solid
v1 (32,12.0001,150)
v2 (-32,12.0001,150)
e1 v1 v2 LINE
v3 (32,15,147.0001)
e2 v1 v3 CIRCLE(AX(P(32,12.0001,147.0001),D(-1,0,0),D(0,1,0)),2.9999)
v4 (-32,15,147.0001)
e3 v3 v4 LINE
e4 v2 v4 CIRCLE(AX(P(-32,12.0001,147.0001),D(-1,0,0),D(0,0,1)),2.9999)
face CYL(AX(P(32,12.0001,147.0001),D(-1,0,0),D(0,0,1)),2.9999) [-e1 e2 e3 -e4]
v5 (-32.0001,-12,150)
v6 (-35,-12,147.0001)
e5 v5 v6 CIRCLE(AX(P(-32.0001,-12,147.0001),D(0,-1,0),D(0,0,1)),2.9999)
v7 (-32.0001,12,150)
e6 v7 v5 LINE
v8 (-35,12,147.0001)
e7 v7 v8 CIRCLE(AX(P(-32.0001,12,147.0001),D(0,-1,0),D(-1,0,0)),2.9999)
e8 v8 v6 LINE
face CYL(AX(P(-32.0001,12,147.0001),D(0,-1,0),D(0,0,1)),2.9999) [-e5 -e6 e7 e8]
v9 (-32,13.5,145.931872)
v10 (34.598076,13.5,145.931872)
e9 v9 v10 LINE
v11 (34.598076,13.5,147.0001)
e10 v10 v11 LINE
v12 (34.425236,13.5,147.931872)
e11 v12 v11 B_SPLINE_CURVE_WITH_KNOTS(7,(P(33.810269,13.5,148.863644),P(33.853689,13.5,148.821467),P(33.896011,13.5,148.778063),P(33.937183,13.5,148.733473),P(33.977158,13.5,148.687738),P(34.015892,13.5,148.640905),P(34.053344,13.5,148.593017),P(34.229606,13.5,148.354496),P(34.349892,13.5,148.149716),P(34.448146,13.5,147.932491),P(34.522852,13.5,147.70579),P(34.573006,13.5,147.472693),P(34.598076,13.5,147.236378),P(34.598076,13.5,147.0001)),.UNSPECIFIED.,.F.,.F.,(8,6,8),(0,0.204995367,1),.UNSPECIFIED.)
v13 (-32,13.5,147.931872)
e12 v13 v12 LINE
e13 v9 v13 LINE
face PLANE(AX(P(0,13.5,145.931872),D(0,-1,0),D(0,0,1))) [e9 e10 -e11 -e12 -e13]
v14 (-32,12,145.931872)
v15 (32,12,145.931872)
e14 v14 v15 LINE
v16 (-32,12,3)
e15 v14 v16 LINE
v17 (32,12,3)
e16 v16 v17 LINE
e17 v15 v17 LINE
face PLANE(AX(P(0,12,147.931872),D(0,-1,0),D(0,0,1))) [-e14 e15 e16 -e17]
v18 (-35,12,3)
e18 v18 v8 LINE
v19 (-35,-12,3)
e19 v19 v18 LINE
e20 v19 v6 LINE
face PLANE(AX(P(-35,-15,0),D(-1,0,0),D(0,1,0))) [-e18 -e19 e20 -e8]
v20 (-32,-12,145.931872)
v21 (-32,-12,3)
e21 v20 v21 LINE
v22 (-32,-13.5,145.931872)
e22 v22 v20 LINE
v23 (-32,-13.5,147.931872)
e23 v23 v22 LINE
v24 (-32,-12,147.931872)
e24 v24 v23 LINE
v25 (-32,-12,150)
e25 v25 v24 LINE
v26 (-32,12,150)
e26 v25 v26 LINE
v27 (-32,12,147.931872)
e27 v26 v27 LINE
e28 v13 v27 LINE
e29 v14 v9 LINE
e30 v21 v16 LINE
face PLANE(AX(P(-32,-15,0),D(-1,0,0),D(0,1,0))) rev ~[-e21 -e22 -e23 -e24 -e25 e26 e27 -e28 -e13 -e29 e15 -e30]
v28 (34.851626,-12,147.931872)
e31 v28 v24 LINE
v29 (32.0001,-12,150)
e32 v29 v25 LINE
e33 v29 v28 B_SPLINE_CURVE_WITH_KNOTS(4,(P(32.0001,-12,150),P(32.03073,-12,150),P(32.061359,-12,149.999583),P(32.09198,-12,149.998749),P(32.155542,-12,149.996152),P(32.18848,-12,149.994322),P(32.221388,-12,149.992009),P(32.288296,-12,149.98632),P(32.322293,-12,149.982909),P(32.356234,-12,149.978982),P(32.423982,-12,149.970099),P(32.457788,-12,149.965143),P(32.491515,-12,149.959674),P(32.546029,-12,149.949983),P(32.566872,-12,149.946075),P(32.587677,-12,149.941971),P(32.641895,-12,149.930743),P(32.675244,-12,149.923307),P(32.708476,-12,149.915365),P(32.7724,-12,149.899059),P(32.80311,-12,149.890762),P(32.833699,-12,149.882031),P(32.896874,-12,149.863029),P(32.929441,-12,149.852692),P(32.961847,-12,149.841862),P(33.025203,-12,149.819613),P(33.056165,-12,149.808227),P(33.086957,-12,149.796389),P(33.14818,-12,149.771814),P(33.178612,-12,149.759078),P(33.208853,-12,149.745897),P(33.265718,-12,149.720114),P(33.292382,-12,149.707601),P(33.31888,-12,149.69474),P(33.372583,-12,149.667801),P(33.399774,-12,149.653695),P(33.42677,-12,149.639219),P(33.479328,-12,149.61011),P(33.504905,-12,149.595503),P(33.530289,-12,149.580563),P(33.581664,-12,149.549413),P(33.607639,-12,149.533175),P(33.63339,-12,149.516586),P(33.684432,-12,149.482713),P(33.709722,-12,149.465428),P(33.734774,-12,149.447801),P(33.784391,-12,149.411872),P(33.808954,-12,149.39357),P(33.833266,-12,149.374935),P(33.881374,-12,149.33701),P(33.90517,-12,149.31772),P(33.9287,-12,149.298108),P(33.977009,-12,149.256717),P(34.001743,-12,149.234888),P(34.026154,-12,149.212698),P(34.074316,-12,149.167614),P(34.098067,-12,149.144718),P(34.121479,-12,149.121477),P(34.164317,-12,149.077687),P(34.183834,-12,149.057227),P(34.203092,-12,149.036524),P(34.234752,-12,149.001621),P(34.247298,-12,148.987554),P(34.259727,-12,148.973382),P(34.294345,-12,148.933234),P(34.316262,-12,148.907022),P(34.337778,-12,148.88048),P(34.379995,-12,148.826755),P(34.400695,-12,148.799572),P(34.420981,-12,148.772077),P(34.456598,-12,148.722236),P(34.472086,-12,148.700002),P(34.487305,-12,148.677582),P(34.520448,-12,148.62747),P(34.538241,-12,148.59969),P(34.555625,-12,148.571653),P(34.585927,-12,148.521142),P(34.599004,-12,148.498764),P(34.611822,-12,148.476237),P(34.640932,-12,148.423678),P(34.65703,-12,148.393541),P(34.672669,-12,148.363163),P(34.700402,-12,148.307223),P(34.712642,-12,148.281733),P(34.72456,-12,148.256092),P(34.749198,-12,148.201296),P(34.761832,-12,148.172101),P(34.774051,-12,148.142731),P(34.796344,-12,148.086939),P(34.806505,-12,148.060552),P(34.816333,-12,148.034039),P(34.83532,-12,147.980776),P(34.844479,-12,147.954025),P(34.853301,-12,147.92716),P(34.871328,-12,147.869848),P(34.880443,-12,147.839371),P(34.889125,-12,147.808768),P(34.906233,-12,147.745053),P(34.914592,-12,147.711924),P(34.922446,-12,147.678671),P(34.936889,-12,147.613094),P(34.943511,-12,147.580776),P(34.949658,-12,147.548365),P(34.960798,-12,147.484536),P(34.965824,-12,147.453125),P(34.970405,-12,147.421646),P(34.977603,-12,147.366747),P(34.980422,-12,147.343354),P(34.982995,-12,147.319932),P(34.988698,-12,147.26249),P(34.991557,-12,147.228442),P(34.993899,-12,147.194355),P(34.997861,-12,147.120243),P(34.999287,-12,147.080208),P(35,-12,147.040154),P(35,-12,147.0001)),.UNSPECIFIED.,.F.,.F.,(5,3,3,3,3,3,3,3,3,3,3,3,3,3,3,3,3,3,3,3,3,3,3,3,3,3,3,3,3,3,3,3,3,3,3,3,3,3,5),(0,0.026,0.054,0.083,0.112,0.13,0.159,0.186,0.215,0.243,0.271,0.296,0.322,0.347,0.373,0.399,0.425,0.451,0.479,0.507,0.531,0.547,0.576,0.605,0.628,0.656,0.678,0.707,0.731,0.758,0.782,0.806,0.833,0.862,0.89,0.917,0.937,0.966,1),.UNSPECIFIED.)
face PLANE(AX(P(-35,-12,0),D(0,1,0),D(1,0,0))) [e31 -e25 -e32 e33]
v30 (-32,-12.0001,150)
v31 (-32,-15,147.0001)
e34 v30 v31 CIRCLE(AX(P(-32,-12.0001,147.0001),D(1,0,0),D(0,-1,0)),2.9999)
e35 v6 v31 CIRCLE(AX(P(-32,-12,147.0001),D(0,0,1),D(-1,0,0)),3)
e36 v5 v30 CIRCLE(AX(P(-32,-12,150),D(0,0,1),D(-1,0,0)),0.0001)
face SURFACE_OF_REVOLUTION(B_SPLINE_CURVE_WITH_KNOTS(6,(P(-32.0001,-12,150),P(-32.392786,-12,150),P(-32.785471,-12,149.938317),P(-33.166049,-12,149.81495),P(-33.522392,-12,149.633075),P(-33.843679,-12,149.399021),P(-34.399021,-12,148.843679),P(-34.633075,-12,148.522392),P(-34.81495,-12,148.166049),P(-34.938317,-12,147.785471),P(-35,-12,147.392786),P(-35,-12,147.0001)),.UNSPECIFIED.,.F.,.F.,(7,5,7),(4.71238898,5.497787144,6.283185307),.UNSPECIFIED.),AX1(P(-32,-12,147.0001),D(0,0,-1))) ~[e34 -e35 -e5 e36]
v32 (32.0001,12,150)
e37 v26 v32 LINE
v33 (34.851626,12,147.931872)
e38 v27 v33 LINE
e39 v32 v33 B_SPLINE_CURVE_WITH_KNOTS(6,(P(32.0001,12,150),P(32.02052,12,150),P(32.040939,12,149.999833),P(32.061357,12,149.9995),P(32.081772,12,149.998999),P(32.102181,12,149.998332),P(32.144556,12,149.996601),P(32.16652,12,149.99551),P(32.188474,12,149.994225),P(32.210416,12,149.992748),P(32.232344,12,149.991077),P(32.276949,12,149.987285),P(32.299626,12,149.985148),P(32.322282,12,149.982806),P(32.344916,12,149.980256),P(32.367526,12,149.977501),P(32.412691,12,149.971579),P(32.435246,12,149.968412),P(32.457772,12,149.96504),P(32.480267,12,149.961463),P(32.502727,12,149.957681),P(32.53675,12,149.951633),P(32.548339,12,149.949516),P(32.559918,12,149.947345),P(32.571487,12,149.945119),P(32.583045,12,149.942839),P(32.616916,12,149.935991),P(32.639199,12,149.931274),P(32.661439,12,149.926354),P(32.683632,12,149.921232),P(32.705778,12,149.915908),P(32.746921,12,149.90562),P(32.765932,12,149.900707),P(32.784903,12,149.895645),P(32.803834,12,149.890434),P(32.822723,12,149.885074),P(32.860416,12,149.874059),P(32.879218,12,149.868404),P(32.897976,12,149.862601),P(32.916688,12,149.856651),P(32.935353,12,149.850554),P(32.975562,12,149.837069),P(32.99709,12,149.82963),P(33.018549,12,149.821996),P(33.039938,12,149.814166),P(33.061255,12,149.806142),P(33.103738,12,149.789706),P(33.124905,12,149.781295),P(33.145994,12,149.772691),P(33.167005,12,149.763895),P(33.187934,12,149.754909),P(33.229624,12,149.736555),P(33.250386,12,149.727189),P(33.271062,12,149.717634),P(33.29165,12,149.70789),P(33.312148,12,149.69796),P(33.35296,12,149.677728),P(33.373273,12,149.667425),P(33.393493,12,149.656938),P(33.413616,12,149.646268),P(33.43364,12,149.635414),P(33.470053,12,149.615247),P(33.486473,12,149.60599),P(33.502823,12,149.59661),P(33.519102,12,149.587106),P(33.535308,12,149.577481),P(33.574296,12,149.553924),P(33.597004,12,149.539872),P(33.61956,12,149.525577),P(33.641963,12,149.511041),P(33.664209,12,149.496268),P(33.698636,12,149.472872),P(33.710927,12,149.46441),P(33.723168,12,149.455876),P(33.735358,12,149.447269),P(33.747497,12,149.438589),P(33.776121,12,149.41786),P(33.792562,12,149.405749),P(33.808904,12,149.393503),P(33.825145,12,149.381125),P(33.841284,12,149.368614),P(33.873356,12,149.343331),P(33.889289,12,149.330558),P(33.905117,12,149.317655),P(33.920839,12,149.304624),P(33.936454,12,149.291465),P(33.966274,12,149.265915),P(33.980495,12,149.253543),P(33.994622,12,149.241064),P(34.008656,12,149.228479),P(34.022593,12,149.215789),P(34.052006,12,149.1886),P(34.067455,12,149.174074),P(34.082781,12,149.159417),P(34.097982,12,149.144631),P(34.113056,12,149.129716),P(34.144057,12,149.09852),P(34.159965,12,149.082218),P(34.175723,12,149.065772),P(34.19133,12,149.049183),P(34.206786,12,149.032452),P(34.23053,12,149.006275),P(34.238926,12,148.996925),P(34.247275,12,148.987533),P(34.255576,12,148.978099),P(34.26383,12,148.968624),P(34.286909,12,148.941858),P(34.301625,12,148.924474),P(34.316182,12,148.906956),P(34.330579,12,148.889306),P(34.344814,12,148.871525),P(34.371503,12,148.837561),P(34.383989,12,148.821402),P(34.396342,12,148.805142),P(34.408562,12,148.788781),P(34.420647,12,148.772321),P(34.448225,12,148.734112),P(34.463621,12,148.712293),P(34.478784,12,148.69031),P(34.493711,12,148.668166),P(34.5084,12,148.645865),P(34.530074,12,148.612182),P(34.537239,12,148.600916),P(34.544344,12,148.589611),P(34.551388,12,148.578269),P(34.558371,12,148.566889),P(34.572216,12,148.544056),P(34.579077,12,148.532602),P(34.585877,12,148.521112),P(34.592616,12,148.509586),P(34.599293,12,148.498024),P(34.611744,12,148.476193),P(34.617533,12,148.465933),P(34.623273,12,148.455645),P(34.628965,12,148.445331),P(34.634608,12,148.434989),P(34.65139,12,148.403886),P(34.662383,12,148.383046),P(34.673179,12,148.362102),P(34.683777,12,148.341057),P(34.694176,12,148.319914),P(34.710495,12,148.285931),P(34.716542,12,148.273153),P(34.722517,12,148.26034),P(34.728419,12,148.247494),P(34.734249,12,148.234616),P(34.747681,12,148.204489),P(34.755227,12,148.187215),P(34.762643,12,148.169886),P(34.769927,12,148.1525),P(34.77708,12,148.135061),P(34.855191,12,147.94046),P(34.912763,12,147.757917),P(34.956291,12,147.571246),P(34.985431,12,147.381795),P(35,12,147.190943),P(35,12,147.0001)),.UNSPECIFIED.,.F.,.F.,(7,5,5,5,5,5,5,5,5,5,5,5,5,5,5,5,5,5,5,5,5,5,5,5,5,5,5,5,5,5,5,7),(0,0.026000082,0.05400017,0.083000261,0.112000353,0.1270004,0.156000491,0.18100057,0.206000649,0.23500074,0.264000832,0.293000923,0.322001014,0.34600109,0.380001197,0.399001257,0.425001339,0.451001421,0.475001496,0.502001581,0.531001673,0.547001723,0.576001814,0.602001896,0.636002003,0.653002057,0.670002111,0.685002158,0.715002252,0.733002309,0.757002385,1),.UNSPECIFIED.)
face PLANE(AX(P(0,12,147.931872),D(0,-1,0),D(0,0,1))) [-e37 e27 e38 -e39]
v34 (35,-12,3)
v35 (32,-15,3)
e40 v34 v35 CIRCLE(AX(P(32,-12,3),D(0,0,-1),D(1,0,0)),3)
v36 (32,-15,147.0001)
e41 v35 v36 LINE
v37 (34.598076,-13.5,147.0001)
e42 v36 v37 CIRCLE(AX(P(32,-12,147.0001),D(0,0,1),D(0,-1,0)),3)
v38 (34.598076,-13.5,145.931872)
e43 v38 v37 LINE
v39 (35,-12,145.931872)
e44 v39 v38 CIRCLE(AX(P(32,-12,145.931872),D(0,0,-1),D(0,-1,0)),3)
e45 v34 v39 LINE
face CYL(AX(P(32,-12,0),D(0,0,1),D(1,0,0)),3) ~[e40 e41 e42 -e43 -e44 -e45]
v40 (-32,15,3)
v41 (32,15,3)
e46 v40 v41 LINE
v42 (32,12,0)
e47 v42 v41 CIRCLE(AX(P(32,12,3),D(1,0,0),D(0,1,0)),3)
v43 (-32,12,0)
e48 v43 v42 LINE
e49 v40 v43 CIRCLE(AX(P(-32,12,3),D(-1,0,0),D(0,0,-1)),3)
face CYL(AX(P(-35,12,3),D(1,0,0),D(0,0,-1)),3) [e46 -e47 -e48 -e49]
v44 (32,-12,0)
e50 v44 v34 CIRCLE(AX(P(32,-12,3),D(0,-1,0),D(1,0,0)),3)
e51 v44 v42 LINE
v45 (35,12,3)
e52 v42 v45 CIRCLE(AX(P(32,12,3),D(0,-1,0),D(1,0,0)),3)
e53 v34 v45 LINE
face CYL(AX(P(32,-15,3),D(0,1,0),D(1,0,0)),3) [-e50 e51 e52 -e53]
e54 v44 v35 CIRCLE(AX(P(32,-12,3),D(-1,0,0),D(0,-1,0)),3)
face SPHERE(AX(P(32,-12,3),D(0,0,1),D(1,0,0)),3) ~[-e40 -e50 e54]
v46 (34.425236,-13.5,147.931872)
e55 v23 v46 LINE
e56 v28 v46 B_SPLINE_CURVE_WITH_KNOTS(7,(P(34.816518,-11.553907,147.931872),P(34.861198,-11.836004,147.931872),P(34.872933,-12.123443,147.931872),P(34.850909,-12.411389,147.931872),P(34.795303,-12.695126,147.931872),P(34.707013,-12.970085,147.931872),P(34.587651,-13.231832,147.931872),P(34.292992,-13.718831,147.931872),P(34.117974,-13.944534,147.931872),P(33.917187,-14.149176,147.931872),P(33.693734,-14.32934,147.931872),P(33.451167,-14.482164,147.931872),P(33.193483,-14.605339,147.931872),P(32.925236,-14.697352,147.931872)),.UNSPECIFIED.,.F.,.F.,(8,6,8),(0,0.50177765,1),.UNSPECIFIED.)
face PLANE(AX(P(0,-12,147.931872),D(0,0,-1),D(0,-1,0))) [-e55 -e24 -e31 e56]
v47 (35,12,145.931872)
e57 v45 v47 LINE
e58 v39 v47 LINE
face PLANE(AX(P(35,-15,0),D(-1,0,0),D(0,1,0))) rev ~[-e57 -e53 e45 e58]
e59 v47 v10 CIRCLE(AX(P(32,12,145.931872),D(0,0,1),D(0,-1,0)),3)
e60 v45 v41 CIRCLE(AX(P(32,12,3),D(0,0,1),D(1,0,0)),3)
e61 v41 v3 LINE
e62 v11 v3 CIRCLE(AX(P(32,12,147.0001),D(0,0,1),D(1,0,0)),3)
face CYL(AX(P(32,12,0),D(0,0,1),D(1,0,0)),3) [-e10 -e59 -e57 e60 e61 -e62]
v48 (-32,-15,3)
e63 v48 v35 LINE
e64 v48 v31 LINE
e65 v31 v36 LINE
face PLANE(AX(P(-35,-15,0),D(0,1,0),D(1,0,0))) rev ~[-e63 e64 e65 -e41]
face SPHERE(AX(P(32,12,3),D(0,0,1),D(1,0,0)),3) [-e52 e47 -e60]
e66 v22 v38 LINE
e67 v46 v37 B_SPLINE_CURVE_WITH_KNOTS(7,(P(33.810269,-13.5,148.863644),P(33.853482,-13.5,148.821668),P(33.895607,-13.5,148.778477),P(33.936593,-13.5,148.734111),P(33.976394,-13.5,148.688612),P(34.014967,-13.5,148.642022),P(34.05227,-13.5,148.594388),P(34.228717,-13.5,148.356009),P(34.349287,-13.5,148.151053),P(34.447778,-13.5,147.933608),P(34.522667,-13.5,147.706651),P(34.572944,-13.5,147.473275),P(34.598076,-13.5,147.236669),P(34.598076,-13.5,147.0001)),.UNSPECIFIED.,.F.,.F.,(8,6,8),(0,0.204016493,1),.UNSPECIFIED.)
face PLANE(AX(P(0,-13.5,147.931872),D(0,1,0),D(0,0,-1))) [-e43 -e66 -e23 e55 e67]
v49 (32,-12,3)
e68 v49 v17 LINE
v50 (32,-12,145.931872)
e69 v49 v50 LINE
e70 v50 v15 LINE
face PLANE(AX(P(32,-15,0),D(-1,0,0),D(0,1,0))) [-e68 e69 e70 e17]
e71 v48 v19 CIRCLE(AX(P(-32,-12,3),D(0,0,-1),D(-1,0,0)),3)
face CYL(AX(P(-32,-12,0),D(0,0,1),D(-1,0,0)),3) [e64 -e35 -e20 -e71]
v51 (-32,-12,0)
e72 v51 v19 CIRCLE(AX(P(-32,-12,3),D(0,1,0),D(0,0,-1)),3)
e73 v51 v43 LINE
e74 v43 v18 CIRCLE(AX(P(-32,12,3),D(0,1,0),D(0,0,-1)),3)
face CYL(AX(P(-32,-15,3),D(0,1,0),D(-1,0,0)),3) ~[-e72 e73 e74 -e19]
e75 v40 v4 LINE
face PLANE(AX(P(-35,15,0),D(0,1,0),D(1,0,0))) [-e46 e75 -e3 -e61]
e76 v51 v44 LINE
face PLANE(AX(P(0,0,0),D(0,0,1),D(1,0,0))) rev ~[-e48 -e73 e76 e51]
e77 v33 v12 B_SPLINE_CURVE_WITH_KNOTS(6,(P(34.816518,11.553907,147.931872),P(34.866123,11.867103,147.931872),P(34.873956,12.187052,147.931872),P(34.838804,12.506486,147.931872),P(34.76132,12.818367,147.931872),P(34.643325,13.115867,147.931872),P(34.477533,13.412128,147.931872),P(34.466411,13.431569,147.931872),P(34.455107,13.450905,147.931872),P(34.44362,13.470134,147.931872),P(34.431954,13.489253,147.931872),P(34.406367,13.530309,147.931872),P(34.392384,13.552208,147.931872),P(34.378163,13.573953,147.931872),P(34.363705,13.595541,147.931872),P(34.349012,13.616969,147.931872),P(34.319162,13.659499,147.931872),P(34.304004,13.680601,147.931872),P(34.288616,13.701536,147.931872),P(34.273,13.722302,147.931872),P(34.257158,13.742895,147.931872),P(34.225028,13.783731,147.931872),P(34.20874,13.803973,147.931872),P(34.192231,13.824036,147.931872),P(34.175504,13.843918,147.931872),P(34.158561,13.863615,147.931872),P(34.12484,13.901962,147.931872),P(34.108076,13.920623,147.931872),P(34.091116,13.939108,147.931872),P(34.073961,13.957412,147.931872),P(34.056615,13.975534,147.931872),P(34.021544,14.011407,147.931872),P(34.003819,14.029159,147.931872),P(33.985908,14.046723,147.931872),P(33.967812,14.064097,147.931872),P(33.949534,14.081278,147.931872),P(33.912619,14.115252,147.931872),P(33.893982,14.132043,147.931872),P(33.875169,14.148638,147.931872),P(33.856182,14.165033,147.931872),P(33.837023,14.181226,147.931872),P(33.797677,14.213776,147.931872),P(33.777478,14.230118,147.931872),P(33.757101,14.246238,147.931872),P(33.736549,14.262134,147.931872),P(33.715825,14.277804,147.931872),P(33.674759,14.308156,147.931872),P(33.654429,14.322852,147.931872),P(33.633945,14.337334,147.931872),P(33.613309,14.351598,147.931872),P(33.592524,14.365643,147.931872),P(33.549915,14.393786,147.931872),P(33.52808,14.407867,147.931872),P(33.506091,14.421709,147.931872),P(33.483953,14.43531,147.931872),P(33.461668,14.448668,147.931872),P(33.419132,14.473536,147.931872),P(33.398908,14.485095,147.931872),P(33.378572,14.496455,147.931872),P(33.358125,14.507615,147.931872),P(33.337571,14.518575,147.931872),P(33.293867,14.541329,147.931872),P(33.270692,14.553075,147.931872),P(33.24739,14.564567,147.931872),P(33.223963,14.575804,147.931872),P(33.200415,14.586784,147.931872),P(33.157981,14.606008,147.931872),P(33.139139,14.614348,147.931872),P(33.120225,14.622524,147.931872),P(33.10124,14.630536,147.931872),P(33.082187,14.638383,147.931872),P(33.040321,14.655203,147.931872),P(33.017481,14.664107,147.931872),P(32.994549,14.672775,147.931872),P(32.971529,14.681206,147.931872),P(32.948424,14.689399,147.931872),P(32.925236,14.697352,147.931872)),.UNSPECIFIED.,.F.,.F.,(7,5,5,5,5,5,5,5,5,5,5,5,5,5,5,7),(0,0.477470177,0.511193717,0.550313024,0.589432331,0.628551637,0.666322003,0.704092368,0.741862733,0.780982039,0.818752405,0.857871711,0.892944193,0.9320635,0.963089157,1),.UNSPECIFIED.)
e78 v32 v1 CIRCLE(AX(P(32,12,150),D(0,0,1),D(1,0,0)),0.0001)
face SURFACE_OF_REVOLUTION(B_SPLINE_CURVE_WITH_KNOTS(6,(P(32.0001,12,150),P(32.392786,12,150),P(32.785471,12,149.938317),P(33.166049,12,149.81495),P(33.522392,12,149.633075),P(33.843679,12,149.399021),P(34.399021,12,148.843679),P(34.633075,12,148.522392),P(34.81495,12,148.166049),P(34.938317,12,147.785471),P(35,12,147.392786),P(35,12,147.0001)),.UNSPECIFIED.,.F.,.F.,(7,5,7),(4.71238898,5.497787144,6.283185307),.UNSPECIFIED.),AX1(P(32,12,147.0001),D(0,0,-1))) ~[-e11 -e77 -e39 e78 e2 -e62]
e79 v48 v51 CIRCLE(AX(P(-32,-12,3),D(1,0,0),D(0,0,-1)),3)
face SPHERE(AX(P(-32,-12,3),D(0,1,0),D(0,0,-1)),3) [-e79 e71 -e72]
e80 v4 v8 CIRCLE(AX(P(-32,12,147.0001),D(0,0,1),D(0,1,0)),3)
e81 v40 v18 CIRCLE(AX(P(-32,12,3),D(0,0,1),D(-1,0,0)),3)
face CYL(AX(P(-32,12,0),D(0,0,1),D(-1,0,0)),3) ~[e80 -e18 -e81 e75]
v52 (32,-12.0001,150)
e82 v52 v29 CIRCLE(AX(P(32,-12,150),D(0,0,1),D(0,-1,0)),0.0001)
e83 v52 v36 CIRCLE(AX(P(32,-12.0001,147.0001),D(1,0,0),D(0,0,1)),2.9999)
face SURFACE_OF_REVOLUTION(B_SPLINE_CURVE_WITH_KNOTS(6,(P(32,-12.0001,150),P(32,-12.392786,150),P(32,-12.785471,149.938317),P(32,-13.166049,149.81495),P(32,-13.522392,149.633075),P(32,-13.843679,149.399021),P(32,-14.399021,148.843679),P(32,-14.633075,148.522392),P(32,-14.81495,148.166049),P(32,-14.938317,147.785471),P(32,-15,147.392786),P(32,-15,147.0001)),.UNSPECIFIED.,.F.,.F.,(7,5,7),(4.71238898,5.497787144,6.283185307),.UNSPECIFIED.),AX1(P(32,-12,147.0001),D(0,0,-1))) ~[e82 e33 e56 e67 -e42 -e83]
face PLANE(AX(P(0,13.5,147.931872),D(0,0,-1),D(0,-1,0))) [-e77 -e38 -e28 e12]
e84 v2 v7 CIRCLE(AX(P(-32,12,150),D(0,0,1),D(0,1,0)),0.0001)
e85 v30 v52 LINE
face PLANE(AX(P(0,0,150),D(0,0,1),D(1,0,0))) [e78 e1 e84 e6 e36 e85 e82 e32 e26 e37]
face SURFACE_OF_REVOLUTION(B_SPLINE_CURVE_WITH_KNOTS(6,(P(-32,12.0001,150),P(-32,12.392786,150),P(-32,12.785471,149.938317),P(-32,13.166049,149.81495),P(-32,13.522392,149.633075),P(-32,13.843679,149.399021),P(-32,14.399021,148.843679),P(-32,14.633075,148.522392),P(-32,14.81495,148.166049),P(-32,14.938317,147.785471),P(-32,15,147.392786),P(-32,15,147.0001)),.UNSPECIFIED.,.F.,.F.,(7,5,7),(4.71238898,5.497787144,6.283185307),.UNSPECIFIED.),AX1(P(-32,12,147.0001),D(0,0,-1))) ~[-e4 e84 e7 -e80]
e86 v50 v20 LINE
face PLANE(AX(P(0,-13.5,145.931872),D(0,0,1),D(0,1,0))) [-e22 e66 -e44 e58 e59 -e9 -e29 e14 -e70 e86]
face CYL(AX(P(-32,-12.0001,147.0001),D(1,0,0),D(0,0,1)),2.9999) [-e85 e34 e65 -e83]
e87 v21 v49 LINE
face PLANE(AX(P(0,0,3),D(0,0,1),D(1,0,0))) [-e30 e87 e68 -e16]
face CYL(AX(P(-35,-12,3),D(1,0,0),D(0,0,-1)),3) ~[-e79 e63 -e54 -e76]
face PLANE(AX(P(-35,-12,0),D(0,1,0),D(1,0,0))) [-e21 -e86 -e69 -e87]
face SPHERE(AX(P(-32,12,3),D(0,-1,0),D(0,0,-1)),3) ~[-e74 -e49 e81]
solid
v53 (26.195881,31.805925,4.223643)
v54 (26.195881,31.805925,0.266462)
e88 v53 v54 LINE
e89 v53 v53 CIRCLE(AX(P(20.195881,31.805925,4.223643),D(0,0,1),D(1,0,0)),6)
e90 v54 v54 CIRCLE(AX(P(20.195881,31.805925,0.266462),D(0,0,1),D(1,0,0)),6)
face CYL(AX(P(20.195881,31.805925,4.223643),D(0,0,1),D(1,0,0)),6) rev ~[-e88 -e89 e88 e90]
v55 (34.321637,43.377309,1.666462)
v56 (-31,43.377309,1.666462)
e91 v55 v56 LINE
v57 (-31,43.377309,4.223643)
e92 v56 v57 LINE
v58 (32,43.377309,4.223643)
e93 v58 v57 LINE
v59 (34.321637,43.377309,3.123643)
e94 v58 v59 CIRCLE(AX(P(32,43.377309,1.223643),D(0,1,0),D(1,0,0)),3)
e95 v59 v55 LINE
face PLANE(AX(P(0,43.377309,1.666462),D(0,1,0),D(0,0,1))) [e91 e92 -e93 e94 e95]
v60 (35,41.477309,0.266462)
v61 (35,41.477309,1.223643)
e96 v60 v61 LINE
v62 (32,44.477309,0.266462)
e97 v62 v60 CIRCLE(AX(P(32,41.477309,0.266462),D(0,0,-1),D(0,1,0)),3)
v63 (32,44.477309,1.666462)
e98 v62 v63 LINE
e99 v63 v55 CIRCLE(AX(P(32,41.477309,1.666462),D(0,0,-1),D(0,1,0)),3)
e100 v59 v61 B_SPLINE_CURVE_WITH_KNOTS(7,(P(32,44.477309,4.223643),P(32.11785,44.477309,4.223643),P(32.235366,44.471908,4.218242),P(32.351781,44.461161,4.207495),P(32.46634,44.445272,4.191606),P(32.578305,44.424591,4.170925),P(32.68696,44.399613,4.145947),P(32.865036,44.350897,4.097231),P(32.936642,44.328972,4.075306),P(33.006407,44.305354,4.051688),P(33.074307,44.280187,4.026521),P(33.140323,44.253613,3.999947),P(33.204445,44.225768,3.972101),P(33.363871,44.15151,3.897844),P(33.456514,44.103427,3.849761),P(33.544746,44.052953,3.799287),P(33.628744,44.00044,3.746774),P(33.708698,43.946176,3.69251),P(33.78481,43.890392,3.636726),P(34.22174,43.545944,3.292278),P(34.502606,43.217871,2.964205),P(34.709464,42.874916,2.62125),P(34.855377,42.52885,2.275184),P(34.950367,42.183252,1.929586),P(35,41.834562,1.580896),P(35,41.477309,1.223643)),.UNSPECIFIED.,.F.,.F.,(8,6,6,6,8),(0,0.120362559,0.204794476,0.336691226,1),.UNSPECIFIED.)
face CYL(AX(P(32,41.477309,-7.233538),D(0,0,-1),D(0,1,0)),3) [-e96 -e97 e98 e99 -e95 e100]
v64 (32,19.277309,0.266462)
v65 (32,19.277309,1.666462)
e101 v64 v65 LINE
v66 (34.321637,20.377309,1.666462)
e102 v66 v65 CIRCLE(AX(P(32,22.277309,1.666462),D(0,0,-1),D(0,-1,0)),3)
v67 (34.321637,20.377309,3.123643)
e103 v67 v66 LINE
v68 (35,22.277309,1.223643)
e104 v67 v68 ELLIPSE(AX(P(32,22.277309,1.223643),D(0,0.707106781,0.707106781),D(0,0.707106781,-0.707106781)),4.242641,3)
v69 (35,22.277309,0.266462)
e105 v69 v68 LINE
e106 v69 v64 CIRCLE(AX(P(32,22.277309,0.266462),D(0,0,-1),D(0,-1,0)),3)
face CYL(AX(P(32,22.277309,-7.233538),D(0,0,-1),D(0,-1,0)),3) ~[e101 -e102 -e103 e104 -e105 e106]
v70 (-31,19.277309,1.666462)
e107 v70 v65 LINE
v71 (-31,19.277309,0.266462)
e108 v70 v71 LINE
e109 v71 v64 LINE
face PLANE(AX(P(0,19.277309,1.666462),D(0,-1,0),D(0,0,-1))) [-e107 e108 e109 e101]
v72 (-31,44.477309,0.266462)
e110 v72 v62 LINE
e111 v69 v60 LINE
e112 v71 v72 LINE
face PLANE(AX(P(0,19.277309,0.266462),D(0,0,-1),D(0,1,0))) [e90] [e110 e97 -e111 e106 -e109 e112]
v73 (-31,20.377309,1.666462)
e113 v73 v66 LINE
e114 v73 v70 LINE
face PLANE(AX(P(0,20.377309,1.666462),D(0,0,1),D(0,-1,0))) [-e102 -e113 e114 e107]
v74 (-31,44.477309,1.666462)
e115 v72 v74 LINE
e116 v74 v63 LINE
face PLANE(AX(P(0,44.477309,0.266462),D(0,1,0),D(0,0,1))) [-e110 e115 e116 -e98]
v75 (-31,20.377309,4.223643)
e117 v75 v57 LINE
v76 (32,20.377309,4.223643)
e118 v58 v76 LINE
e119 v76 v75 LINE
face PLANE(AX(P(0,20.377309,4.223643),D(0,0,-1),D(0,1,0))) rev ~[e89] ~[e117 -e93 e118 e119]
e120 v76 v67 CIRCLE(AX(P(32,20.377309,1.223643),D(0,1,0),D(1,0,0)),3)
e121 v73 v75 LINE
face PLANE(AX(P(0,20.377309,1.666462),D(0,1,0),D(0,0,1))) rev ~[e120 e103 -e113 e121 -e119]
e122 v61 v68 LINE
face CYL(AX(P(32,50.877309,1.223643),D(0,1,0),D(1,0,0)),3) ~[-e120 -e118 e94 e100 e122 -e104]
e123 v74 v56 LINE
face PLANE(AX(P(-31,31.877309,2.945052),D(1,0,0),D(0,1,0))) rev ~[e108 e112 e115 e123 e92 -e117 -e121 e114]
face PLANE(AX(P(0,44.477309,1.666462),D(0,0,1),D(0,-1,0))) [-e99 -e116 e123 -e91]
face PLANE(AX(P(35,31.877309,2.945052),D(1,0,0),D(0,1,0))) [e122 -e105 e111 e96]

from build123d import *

# Parameters (mm, degrees)
F0_W          = 70
F0_H          = 30
F1_DEPTH      = 150
F2_T          = -3
F3_W          = 24
F3_H          = 2.5384937525
F3_H_2        = 0.4615062475
F4_DEPTH      = 36.4
F4_DEPTH_BACK = 32
F5_R          = 3
F6_R          = 2.9999
F7_W          = 23
F7_H          = 2.5571812009
F7_H_2        = 0.0428187991
F8_DEPTH      = 35
F8_DEPTH_BACK = 31
F9_T1_DEPTH   = 38
F9_T3_DEPTH   = 16.4
F10_R         = 6
F11_DEPTH     = 4.2246429837


# Not quite as in the source:
# - a fillet or chamfer that OpenCascade refuses, or shapes differently, is made with other operations: its cross-section is extruded or revolved along the edge and cut away or added
# - a fillet or chamfer is up to 0.001 mm smaller than in the source, because OpenCascade refuses the exact size


with BuildPart() as f1:
    # F0 (on Top) → F1 (new body)
    with BuildSketch(Plane.XY):
        Rectangle(F0_W, F0_H)
    extrude(amount=F1_DEPTH)

    # F2
    f2_openings = [f1.faces().sort_by_distance(p)[0] for p in [
        (0, 0, 150),
    ]]
    offset(amount=F2_T, openings=f2_openings)

    # F3 (on Right) → F4 (cut, two sides)
    with BuildSketch(Plane.YZ) as f4_sk:
        with Locations((0, 149.2011186481)):
            Rectangle(F3_W, F3_H)
        Polygon((13.5, 147.9318717718), (12, 147.9318717718), (12, 147.4703655243), (-12, 147.4703655243), (-12, 147.9318717718), (-13.5, 147.9318717718), (-13.5, 145.9318717718), (13.5, 145.9318717718), align=None)
        with Locations((0, 147.7011186481)):
            Rectangle(F3_W, F3_H_2)
    extrude(amount=F4_DEPTH, mode=Mode.SUBTRACT)
    extrude(f4_sk.sketch, amount=-F4_DEPTH_BACK, mode=Mode.SUBTRACT)

    # F5
    f5_edges = [f1.edges().sort_by_distance(p)[0] for p in [
        (35, 15, 75),
        (35, -15, 75),
        (35, 0, 0),
        (-35, 0, 0),
        (0, -15, 0),
        (0, 15, 0),
        (-35, 15, 75),
        (-35, -15, 75),
    ]]
    fillet(f5_edges, radius=F5_R)

    # F6 (radius 3 in the source; OpenCascade refuses exactly that, so slightly less here)
    f6_edges = [f1.edges().sort_by_distance(p)[0] for p in [
        (0, -15, 150),
    ]]
    fillet(f6_edges, radius=F6_R)


with BuildPart() as f8:
    # F7 (on Right) → F8 (new body, two sides)
    with BuildSketch(Plane.YZ) as f8_sk:
        with Locations((31.8773090839, 2.9450523832)):
            Rectangle(F7_W, F7_H)
        Polygon((44.4773090839, 1.6664617828), (43.3773090839, 1.6664617828), (43.3773090839, 1.6236429837), (20.3773090839, 1.6236429837), (20.3773090839, 1.6664617828), (19.2773090839, 1.6664617828), (19.2773090839, 0.2664617828), (44.4773090839, 0.2664617828), align=None)
        with Locations((31.8773090839, 1.6450523832)):
            Rectangle(F7_W, F7_H_2)
    extrude(amount=F8_DEPTH)
    extrude(f8_sk.sketch, amount=-F8_DEPTH_BACK)

    # F9: fillet of radius 3 on 3 edges, made by hand

    # F9_s2 → F9_t1 (cut)
    with BuildSketch(Plane.XZ.offset(-50.8773090839)):
        with BuildLine():
            ThreePointArc((35, 1.2236429837), (34.1213203436, 3.3449633272), (32, 4.2236429837))
            Line((32, 4.2236429837), (35, 4.2236429837))
            Line((35, 4.2236429837), (35, 1.2236429837))
        make_face()
    extrude(amount=F9_T1_DEPTH, mode=Mode.SUBTRACT)

    # F9_s4 → F9_t3 (cut)
    with BuildSketch(Plane.XY.offset(-7.2335382172)):
        with BuildLine():
            ThreePointArc((32, 19.2773090839), (34.1213203436, 20.1559887404), (35, 22.2773090839))
            Line((35, 22.2773090839), (35, 19.2773090839))
            Line((35, 19.2773090839), (32, 19.2773090839))
        make_face()
        with BuildLine():
            ThreePointArc((32, 44.4773090839), (34.1213203436, 43.5986294275), (35, 41.4773090839))
            Line((35, 41.4773090839), (35, 44.4773090839))
            Line((35, 44.4773090839), (32, 44.4773090839))
        make_face()
    extrude(amount=F9_T3_DEPTH, mode=Mode.SUBTRACT)

    # F10 (on face) → F11 (cut, through all)
    with BuildSketch(Plane.XY.offset(4.2236429837)):
        with Locations((20.1958809048, 31.8059250712)):
            Circle(F10_R)
    extrude(amount=-F11_DEPTH, mode=Mode.SUBTRACT)


solid = Compound([f1.part, f8.part])
